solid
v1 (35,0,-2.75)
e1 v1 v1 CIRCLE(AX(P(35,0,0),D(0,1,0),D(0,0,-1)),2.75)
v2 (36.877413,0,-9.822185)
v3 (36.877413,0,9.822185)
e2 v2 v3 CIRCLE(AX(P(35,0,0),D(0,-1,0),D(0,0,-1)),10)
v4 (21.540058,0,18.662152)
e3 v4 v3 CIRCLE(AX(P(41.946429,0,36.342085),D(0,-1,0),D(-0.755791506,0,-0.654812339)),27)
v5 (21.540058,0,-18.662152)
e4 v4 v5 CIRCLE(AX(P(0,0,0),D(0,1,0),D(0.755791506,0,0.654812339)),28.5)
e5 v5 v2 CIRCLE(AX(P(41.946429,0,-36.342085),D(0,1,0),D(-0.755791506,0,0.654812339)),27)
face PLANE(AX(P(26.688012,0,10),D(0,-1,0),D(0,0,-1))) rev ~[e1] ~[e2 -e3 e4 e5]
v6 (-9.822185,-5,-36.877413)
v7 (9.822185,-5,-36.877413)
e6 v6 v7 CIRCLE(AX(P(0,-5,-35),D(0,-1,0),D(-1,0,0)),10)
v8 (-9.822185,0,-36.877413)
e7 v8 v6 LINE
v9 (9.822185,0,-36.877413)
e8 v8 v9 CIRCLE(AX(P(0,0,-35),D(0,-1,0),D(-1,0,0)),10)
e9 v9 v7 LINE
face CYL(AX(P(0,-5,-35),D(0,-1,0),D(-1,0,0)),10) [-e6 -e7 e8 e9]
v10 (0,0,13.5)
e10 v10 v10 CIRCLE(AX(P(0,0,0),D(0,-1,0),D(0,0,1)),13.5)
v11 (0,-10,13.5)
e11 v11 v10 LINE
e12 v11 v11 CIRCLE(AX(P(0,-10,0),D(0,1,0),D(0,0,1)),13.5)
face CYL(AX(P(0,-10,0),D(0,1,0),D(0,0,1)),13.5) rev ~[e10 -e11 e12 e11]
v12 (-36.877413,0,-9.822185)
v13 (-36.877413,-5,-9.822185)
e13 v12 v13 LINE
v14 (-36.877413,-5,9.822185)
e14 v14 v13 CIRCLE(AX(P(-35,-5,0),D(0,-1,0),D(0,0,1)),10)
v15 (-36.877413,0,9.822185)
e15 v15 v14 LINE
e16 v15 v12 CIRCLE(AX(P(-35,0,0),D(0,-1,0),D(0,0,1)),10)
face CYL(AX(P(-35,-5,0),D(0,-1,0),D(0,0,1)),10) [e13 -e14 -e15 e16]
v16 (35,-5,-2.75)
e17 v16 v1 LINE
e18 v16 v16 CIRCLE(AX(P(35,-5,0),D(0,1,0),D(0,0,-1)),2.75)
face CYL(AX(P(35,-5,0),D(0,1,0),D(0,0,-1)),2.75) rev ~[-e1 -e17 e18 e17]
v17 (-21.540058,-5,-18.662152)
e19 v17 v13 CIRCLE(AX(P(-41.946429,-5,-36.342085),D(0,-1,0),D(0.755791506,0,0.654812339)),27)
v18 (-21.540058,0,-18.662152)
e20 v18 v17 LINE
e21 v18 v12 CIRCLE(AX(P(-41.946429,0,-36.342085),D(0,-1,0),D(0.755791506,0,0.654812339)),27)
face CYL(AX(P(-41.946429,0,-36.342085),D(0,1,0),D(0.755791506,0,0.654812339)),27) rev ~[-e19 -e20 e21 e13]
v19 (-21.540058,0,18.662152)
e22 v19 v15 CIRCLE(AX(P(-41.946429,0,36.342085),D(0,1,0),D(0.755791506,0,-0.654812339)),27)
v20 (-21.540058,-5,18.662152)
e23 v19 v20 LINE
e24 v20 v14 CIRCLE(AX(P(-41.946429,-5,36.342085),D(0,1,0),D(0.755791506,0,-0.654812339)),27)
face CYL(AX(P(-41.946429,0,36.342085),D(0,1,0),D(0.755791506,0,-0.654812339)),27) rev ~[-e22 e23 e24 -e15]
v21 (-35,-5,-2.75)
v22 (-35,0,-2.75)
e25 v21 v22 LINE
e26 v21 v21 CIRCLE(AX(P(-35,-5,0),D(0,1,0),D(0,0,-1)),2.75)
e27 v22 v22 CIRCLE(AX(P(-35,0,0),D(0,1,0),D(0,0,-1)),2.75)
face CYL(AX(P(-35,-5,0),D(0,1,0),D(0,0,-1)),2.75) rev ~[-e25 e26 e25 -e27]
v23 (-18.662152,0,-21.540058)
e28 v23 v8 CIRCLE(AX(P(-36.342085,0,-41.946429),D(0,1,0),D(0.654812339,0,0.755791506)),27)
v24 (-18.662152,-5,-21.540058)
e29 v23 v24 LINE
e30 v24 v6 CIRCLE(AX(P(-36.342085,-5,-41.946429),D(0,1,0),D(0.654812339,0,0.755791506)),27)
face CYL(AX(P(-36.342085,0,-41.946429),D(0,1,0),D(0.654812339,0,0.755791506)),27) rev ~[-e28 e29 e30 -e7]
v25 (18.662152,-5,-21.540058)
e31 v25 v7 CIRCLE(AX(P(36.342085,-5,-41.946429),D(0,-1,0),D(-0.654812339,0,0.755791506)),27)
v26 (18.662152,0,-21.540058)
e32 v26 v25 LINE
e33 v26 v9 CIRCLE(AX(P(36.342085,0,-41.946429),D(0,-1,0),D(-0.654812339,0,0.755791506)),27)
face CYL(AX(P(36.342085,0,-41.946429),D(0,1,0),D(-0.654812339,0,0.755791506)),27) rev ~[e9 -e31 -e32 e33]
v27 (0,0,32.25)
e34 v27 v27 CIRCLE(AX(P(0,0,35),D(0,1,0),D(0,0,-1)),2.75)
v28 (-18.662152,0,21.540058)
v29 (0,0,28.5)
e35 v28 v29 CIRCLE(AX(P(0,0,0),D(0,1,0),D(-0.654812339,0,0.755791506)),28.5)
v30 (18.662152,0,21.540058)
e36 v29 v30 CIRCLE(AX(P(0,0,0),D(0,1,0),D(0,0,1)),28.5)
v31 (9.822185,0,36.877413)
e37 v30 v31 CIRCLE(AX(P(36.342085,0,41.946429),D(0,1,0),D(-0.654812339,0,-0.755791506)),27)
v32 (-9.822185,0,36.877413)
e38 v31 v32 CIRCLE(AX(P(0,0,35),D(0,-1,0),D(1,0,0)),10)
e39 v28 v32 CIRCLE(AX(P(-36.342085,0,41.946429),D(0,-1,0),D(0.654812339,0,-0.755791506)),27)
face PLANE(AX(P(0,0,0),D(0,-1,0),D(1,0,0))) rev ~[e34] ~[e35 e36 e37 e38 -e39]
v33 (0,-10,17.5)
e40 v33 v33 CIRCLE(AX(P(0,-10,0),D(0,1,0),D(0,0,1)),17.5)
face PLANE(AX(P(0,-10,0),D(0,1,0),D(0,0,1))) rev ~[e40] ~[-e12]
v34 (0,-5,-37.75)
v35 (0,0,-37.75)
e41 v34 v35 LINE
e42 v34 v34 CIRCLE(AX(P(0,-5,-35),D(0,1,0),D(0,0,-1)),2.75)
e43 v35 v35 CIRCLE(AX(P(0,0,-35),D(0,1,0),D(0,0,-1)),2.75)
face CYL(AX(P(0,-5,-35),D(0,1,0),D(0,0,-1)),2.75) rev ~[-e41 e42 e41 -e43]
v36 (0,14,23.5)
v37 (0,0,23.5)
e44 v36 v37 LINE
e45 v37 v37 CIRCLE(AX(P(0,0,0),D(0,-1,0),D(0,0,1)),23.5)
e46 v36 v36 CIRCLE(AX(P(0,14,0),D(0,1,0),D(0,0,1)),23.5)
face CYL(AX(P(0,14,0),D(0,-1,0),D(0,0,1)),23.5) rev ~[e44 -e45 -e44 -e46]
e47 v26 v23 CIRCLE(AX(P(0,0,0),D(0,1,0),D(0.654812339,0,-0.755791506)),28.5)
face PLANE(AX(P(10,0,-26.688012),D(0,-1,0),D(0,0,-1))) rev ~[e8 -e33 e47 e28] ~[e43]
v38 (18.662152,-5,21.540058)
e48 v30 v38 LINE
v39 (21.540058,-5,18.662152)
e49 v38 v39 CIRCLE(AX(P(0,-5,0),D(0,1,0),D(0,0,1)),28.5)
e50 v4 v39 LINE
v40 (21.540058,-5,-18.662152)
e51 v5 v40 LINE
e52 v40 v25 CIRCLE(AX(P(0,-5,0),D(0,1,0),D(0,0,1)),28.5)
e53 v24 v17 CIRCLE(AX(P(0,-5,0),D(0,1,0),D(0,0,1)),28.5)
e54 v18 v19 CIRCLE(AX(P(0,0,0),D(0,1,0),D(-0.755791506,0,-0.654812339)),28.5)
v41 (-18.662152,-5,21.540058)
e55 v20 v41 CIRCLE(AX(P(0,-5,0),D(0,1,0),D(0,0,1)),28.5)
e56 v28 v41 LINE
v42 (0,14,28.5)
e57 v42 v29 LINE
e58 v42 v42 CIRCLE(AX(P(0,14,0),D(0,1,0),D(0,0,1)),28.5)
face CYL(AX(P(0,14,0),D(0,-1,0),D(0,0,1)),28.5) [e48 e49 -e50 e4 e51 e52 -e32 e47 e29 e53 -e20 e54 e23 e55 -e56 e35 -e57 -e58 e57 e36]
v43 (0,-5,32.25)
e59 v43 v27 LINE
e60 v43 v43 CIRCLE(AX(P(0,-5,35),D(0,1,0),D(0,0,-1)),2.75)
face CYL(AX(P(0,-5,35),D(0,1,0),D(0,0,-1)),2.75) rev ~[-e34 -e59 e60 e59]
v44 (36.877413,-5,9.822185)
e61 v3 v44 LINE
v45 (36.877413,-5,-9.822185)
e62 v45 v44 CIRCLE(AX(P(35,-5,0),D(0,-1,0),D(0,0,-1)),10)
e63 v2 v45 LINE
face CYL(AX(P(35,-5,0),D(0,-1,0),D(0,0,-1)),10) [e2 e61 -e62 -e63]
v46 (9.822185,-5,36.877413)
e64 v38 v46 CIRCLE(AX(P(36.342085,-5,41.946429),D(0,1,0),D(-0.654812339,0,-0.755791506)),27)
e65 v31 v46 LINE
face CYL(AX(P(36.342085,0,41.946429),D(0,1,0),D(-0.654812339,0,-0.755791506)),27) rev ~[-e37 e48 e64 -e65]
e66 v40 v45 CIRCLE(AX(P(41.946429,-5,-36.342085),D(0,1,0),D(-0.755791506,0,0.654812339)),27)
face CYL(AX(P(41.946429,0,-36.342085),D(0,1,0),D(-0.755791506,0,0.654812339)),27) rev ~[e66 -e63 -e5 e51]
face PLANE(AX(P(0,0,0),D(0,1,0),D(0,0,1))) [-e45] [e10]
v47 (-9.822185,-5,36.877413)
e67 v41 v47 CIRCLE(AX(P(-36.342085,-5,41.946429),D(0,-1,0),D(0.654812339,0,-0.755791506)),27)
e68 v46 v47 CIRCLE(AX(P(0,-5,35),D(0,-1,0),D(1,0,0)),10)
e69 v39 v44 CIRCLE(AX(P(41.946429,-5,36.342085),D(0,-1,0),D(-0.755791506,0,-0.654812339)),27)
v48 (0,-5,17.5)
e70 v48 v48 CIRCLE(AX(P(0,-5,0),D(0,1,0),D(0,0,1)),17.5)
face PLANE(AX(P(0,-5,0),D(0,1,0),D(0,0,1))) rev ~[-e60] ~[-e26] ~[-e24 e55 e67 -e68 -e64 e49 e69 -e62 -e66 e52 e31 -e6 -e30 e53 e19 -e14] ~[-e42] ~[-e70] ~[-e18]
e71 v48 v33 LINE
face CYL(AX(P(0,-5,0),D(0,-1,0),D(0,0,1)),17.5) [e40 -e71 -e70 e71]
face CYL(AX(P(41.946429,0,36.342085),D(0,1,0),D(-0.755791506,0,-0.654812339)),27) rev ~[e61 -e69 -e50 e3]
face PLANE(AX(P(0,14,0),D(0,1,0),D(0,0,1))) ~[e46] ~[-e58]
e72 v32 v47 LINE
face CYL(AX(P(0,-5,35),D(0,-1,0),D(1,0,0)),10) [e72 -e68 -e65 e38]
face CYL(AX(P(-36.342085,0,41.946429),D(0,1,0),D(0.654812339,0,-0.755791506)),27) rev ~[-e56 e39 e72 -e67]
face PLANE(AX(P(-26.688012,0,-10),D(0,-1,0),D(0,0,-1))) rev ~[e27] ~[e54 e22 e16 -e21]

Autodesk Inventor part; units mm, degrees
ref_plane "YZ Plane" through (0, 0, 0) normal (1, 0, 0) x (0, 1, 0)
ref_plane "XZ Plane" through (0, 0, 0) normal (0, 1, 0) x (-1, 0, 0)
ref_plane "XY Plane" through (0, 0, 0) normal (0, 0, 1) x (1, 0, 0)
sketch "Sketch1" plane through (0, 0, 0) normal (1, 0, 0) x (0, 1, 0)
  line L0 (0, 0) -> (0, 23.5) construction
  line L1 (0, 23.5) -> (14, 23.5) construction
  line L2 (14, 23.5) -> (14, 0) construction
  line L3 (14, 23.5) -> (14, 28.5)
  line L4 (14, 28.5) -> (-5, 28.5)
  line L5 (14, 23.5) -> (0, 23.5)
  line L6 (-5, 28.5) -> (-5, 17.5)
  line L7 (-5, 17.5) -> (-10, 17.5)
  line L8 (-14.8, 0) -> (18.8, 0) projected
  line L9 (-10, 0) -> (-10, 13.5) construction
  line L10 (-10, 13.5) -> (0, 13.5)
  line L11 (0, 23.5) -> (0, 13.5)
  line L12 (-10, 17.5) -> (-10, 13.5)
  dimension "d0" = 23.5
  dimension "d1" = 14
  dimension "d2" = 5
  dimension "d3" = 19
  dimension "d8" = 11
  dimension "d9" = 5
  dimension "d11" = 13.5
revolve "Revolution1" add sketch "Sketch1" angle 360 about axis through (0, -10, 0) along (0, 1, 0)
sketch "Sketch2" plane through (0, -5, 0) normal (0, -1, 0) x (1, 0, 0)
  line L0 (-35, 0) -> (35, 0) construction
  arc A0 (-35, 10) -> (-35, -10) centre (-35, 0) ccw
  arc A1 (35, -10) -> (35, 10) centre (35, 0) ccw
  line L1 (0, -35) -> (0, 35) construction
  arc A2 (-10, -35) -> (10, -35) centre (0, -35) ccw
  arc A3 (10, 35) -> (-10, 35) centre (0, 35) ccw
  line L2 (-10, 35) -> (-10, 10)
  line L3 (-10, -10) -> (-10, -35)
  line L4 (35, 10) -> (10, 10)
  line L5 (-10, 10) -> (-35, 10)
  line L6 (10, -35) -> (10, -10)
  line L7 (10, 10) -> (10, 35)
  line L8 (-35, -10) -> (-10, -10)
  line L9 (10, -10) -> (35, -10)
  circle A4 centre (0, 0) radius 13.5
  dimension "d12" = 35
  dimension "d13" = 20
  dimension "d14" = 35
  dimension "d15" = 20
extrude "Extrusion1" add sketch "Sketch2" against normal blind 5
fillet "Fillet1" radius 27 8 edges at (10, -2.5, 26.688) (26.688, -2.5, 10) (-10, -2.5, 26.688) (-26.688, -2.5, 10) (-26.688, -2.5, -10) (-10, -2.5, -26.688) (10, -2.5, -26.688) (26.688, -2.5, -10)
hole "Hole1" at (0, -5, 35) at (35, -5, 0) at (0, -5, -35) at (-35, -5, 0) direction (0, 1, 0) diameter 5.5 end through all clearance for "Hex Head Bolt" size "M5" standard "Ansi Metric M Profile"
properties part number "ThrustBearingMount" material "ABS Plastic"
